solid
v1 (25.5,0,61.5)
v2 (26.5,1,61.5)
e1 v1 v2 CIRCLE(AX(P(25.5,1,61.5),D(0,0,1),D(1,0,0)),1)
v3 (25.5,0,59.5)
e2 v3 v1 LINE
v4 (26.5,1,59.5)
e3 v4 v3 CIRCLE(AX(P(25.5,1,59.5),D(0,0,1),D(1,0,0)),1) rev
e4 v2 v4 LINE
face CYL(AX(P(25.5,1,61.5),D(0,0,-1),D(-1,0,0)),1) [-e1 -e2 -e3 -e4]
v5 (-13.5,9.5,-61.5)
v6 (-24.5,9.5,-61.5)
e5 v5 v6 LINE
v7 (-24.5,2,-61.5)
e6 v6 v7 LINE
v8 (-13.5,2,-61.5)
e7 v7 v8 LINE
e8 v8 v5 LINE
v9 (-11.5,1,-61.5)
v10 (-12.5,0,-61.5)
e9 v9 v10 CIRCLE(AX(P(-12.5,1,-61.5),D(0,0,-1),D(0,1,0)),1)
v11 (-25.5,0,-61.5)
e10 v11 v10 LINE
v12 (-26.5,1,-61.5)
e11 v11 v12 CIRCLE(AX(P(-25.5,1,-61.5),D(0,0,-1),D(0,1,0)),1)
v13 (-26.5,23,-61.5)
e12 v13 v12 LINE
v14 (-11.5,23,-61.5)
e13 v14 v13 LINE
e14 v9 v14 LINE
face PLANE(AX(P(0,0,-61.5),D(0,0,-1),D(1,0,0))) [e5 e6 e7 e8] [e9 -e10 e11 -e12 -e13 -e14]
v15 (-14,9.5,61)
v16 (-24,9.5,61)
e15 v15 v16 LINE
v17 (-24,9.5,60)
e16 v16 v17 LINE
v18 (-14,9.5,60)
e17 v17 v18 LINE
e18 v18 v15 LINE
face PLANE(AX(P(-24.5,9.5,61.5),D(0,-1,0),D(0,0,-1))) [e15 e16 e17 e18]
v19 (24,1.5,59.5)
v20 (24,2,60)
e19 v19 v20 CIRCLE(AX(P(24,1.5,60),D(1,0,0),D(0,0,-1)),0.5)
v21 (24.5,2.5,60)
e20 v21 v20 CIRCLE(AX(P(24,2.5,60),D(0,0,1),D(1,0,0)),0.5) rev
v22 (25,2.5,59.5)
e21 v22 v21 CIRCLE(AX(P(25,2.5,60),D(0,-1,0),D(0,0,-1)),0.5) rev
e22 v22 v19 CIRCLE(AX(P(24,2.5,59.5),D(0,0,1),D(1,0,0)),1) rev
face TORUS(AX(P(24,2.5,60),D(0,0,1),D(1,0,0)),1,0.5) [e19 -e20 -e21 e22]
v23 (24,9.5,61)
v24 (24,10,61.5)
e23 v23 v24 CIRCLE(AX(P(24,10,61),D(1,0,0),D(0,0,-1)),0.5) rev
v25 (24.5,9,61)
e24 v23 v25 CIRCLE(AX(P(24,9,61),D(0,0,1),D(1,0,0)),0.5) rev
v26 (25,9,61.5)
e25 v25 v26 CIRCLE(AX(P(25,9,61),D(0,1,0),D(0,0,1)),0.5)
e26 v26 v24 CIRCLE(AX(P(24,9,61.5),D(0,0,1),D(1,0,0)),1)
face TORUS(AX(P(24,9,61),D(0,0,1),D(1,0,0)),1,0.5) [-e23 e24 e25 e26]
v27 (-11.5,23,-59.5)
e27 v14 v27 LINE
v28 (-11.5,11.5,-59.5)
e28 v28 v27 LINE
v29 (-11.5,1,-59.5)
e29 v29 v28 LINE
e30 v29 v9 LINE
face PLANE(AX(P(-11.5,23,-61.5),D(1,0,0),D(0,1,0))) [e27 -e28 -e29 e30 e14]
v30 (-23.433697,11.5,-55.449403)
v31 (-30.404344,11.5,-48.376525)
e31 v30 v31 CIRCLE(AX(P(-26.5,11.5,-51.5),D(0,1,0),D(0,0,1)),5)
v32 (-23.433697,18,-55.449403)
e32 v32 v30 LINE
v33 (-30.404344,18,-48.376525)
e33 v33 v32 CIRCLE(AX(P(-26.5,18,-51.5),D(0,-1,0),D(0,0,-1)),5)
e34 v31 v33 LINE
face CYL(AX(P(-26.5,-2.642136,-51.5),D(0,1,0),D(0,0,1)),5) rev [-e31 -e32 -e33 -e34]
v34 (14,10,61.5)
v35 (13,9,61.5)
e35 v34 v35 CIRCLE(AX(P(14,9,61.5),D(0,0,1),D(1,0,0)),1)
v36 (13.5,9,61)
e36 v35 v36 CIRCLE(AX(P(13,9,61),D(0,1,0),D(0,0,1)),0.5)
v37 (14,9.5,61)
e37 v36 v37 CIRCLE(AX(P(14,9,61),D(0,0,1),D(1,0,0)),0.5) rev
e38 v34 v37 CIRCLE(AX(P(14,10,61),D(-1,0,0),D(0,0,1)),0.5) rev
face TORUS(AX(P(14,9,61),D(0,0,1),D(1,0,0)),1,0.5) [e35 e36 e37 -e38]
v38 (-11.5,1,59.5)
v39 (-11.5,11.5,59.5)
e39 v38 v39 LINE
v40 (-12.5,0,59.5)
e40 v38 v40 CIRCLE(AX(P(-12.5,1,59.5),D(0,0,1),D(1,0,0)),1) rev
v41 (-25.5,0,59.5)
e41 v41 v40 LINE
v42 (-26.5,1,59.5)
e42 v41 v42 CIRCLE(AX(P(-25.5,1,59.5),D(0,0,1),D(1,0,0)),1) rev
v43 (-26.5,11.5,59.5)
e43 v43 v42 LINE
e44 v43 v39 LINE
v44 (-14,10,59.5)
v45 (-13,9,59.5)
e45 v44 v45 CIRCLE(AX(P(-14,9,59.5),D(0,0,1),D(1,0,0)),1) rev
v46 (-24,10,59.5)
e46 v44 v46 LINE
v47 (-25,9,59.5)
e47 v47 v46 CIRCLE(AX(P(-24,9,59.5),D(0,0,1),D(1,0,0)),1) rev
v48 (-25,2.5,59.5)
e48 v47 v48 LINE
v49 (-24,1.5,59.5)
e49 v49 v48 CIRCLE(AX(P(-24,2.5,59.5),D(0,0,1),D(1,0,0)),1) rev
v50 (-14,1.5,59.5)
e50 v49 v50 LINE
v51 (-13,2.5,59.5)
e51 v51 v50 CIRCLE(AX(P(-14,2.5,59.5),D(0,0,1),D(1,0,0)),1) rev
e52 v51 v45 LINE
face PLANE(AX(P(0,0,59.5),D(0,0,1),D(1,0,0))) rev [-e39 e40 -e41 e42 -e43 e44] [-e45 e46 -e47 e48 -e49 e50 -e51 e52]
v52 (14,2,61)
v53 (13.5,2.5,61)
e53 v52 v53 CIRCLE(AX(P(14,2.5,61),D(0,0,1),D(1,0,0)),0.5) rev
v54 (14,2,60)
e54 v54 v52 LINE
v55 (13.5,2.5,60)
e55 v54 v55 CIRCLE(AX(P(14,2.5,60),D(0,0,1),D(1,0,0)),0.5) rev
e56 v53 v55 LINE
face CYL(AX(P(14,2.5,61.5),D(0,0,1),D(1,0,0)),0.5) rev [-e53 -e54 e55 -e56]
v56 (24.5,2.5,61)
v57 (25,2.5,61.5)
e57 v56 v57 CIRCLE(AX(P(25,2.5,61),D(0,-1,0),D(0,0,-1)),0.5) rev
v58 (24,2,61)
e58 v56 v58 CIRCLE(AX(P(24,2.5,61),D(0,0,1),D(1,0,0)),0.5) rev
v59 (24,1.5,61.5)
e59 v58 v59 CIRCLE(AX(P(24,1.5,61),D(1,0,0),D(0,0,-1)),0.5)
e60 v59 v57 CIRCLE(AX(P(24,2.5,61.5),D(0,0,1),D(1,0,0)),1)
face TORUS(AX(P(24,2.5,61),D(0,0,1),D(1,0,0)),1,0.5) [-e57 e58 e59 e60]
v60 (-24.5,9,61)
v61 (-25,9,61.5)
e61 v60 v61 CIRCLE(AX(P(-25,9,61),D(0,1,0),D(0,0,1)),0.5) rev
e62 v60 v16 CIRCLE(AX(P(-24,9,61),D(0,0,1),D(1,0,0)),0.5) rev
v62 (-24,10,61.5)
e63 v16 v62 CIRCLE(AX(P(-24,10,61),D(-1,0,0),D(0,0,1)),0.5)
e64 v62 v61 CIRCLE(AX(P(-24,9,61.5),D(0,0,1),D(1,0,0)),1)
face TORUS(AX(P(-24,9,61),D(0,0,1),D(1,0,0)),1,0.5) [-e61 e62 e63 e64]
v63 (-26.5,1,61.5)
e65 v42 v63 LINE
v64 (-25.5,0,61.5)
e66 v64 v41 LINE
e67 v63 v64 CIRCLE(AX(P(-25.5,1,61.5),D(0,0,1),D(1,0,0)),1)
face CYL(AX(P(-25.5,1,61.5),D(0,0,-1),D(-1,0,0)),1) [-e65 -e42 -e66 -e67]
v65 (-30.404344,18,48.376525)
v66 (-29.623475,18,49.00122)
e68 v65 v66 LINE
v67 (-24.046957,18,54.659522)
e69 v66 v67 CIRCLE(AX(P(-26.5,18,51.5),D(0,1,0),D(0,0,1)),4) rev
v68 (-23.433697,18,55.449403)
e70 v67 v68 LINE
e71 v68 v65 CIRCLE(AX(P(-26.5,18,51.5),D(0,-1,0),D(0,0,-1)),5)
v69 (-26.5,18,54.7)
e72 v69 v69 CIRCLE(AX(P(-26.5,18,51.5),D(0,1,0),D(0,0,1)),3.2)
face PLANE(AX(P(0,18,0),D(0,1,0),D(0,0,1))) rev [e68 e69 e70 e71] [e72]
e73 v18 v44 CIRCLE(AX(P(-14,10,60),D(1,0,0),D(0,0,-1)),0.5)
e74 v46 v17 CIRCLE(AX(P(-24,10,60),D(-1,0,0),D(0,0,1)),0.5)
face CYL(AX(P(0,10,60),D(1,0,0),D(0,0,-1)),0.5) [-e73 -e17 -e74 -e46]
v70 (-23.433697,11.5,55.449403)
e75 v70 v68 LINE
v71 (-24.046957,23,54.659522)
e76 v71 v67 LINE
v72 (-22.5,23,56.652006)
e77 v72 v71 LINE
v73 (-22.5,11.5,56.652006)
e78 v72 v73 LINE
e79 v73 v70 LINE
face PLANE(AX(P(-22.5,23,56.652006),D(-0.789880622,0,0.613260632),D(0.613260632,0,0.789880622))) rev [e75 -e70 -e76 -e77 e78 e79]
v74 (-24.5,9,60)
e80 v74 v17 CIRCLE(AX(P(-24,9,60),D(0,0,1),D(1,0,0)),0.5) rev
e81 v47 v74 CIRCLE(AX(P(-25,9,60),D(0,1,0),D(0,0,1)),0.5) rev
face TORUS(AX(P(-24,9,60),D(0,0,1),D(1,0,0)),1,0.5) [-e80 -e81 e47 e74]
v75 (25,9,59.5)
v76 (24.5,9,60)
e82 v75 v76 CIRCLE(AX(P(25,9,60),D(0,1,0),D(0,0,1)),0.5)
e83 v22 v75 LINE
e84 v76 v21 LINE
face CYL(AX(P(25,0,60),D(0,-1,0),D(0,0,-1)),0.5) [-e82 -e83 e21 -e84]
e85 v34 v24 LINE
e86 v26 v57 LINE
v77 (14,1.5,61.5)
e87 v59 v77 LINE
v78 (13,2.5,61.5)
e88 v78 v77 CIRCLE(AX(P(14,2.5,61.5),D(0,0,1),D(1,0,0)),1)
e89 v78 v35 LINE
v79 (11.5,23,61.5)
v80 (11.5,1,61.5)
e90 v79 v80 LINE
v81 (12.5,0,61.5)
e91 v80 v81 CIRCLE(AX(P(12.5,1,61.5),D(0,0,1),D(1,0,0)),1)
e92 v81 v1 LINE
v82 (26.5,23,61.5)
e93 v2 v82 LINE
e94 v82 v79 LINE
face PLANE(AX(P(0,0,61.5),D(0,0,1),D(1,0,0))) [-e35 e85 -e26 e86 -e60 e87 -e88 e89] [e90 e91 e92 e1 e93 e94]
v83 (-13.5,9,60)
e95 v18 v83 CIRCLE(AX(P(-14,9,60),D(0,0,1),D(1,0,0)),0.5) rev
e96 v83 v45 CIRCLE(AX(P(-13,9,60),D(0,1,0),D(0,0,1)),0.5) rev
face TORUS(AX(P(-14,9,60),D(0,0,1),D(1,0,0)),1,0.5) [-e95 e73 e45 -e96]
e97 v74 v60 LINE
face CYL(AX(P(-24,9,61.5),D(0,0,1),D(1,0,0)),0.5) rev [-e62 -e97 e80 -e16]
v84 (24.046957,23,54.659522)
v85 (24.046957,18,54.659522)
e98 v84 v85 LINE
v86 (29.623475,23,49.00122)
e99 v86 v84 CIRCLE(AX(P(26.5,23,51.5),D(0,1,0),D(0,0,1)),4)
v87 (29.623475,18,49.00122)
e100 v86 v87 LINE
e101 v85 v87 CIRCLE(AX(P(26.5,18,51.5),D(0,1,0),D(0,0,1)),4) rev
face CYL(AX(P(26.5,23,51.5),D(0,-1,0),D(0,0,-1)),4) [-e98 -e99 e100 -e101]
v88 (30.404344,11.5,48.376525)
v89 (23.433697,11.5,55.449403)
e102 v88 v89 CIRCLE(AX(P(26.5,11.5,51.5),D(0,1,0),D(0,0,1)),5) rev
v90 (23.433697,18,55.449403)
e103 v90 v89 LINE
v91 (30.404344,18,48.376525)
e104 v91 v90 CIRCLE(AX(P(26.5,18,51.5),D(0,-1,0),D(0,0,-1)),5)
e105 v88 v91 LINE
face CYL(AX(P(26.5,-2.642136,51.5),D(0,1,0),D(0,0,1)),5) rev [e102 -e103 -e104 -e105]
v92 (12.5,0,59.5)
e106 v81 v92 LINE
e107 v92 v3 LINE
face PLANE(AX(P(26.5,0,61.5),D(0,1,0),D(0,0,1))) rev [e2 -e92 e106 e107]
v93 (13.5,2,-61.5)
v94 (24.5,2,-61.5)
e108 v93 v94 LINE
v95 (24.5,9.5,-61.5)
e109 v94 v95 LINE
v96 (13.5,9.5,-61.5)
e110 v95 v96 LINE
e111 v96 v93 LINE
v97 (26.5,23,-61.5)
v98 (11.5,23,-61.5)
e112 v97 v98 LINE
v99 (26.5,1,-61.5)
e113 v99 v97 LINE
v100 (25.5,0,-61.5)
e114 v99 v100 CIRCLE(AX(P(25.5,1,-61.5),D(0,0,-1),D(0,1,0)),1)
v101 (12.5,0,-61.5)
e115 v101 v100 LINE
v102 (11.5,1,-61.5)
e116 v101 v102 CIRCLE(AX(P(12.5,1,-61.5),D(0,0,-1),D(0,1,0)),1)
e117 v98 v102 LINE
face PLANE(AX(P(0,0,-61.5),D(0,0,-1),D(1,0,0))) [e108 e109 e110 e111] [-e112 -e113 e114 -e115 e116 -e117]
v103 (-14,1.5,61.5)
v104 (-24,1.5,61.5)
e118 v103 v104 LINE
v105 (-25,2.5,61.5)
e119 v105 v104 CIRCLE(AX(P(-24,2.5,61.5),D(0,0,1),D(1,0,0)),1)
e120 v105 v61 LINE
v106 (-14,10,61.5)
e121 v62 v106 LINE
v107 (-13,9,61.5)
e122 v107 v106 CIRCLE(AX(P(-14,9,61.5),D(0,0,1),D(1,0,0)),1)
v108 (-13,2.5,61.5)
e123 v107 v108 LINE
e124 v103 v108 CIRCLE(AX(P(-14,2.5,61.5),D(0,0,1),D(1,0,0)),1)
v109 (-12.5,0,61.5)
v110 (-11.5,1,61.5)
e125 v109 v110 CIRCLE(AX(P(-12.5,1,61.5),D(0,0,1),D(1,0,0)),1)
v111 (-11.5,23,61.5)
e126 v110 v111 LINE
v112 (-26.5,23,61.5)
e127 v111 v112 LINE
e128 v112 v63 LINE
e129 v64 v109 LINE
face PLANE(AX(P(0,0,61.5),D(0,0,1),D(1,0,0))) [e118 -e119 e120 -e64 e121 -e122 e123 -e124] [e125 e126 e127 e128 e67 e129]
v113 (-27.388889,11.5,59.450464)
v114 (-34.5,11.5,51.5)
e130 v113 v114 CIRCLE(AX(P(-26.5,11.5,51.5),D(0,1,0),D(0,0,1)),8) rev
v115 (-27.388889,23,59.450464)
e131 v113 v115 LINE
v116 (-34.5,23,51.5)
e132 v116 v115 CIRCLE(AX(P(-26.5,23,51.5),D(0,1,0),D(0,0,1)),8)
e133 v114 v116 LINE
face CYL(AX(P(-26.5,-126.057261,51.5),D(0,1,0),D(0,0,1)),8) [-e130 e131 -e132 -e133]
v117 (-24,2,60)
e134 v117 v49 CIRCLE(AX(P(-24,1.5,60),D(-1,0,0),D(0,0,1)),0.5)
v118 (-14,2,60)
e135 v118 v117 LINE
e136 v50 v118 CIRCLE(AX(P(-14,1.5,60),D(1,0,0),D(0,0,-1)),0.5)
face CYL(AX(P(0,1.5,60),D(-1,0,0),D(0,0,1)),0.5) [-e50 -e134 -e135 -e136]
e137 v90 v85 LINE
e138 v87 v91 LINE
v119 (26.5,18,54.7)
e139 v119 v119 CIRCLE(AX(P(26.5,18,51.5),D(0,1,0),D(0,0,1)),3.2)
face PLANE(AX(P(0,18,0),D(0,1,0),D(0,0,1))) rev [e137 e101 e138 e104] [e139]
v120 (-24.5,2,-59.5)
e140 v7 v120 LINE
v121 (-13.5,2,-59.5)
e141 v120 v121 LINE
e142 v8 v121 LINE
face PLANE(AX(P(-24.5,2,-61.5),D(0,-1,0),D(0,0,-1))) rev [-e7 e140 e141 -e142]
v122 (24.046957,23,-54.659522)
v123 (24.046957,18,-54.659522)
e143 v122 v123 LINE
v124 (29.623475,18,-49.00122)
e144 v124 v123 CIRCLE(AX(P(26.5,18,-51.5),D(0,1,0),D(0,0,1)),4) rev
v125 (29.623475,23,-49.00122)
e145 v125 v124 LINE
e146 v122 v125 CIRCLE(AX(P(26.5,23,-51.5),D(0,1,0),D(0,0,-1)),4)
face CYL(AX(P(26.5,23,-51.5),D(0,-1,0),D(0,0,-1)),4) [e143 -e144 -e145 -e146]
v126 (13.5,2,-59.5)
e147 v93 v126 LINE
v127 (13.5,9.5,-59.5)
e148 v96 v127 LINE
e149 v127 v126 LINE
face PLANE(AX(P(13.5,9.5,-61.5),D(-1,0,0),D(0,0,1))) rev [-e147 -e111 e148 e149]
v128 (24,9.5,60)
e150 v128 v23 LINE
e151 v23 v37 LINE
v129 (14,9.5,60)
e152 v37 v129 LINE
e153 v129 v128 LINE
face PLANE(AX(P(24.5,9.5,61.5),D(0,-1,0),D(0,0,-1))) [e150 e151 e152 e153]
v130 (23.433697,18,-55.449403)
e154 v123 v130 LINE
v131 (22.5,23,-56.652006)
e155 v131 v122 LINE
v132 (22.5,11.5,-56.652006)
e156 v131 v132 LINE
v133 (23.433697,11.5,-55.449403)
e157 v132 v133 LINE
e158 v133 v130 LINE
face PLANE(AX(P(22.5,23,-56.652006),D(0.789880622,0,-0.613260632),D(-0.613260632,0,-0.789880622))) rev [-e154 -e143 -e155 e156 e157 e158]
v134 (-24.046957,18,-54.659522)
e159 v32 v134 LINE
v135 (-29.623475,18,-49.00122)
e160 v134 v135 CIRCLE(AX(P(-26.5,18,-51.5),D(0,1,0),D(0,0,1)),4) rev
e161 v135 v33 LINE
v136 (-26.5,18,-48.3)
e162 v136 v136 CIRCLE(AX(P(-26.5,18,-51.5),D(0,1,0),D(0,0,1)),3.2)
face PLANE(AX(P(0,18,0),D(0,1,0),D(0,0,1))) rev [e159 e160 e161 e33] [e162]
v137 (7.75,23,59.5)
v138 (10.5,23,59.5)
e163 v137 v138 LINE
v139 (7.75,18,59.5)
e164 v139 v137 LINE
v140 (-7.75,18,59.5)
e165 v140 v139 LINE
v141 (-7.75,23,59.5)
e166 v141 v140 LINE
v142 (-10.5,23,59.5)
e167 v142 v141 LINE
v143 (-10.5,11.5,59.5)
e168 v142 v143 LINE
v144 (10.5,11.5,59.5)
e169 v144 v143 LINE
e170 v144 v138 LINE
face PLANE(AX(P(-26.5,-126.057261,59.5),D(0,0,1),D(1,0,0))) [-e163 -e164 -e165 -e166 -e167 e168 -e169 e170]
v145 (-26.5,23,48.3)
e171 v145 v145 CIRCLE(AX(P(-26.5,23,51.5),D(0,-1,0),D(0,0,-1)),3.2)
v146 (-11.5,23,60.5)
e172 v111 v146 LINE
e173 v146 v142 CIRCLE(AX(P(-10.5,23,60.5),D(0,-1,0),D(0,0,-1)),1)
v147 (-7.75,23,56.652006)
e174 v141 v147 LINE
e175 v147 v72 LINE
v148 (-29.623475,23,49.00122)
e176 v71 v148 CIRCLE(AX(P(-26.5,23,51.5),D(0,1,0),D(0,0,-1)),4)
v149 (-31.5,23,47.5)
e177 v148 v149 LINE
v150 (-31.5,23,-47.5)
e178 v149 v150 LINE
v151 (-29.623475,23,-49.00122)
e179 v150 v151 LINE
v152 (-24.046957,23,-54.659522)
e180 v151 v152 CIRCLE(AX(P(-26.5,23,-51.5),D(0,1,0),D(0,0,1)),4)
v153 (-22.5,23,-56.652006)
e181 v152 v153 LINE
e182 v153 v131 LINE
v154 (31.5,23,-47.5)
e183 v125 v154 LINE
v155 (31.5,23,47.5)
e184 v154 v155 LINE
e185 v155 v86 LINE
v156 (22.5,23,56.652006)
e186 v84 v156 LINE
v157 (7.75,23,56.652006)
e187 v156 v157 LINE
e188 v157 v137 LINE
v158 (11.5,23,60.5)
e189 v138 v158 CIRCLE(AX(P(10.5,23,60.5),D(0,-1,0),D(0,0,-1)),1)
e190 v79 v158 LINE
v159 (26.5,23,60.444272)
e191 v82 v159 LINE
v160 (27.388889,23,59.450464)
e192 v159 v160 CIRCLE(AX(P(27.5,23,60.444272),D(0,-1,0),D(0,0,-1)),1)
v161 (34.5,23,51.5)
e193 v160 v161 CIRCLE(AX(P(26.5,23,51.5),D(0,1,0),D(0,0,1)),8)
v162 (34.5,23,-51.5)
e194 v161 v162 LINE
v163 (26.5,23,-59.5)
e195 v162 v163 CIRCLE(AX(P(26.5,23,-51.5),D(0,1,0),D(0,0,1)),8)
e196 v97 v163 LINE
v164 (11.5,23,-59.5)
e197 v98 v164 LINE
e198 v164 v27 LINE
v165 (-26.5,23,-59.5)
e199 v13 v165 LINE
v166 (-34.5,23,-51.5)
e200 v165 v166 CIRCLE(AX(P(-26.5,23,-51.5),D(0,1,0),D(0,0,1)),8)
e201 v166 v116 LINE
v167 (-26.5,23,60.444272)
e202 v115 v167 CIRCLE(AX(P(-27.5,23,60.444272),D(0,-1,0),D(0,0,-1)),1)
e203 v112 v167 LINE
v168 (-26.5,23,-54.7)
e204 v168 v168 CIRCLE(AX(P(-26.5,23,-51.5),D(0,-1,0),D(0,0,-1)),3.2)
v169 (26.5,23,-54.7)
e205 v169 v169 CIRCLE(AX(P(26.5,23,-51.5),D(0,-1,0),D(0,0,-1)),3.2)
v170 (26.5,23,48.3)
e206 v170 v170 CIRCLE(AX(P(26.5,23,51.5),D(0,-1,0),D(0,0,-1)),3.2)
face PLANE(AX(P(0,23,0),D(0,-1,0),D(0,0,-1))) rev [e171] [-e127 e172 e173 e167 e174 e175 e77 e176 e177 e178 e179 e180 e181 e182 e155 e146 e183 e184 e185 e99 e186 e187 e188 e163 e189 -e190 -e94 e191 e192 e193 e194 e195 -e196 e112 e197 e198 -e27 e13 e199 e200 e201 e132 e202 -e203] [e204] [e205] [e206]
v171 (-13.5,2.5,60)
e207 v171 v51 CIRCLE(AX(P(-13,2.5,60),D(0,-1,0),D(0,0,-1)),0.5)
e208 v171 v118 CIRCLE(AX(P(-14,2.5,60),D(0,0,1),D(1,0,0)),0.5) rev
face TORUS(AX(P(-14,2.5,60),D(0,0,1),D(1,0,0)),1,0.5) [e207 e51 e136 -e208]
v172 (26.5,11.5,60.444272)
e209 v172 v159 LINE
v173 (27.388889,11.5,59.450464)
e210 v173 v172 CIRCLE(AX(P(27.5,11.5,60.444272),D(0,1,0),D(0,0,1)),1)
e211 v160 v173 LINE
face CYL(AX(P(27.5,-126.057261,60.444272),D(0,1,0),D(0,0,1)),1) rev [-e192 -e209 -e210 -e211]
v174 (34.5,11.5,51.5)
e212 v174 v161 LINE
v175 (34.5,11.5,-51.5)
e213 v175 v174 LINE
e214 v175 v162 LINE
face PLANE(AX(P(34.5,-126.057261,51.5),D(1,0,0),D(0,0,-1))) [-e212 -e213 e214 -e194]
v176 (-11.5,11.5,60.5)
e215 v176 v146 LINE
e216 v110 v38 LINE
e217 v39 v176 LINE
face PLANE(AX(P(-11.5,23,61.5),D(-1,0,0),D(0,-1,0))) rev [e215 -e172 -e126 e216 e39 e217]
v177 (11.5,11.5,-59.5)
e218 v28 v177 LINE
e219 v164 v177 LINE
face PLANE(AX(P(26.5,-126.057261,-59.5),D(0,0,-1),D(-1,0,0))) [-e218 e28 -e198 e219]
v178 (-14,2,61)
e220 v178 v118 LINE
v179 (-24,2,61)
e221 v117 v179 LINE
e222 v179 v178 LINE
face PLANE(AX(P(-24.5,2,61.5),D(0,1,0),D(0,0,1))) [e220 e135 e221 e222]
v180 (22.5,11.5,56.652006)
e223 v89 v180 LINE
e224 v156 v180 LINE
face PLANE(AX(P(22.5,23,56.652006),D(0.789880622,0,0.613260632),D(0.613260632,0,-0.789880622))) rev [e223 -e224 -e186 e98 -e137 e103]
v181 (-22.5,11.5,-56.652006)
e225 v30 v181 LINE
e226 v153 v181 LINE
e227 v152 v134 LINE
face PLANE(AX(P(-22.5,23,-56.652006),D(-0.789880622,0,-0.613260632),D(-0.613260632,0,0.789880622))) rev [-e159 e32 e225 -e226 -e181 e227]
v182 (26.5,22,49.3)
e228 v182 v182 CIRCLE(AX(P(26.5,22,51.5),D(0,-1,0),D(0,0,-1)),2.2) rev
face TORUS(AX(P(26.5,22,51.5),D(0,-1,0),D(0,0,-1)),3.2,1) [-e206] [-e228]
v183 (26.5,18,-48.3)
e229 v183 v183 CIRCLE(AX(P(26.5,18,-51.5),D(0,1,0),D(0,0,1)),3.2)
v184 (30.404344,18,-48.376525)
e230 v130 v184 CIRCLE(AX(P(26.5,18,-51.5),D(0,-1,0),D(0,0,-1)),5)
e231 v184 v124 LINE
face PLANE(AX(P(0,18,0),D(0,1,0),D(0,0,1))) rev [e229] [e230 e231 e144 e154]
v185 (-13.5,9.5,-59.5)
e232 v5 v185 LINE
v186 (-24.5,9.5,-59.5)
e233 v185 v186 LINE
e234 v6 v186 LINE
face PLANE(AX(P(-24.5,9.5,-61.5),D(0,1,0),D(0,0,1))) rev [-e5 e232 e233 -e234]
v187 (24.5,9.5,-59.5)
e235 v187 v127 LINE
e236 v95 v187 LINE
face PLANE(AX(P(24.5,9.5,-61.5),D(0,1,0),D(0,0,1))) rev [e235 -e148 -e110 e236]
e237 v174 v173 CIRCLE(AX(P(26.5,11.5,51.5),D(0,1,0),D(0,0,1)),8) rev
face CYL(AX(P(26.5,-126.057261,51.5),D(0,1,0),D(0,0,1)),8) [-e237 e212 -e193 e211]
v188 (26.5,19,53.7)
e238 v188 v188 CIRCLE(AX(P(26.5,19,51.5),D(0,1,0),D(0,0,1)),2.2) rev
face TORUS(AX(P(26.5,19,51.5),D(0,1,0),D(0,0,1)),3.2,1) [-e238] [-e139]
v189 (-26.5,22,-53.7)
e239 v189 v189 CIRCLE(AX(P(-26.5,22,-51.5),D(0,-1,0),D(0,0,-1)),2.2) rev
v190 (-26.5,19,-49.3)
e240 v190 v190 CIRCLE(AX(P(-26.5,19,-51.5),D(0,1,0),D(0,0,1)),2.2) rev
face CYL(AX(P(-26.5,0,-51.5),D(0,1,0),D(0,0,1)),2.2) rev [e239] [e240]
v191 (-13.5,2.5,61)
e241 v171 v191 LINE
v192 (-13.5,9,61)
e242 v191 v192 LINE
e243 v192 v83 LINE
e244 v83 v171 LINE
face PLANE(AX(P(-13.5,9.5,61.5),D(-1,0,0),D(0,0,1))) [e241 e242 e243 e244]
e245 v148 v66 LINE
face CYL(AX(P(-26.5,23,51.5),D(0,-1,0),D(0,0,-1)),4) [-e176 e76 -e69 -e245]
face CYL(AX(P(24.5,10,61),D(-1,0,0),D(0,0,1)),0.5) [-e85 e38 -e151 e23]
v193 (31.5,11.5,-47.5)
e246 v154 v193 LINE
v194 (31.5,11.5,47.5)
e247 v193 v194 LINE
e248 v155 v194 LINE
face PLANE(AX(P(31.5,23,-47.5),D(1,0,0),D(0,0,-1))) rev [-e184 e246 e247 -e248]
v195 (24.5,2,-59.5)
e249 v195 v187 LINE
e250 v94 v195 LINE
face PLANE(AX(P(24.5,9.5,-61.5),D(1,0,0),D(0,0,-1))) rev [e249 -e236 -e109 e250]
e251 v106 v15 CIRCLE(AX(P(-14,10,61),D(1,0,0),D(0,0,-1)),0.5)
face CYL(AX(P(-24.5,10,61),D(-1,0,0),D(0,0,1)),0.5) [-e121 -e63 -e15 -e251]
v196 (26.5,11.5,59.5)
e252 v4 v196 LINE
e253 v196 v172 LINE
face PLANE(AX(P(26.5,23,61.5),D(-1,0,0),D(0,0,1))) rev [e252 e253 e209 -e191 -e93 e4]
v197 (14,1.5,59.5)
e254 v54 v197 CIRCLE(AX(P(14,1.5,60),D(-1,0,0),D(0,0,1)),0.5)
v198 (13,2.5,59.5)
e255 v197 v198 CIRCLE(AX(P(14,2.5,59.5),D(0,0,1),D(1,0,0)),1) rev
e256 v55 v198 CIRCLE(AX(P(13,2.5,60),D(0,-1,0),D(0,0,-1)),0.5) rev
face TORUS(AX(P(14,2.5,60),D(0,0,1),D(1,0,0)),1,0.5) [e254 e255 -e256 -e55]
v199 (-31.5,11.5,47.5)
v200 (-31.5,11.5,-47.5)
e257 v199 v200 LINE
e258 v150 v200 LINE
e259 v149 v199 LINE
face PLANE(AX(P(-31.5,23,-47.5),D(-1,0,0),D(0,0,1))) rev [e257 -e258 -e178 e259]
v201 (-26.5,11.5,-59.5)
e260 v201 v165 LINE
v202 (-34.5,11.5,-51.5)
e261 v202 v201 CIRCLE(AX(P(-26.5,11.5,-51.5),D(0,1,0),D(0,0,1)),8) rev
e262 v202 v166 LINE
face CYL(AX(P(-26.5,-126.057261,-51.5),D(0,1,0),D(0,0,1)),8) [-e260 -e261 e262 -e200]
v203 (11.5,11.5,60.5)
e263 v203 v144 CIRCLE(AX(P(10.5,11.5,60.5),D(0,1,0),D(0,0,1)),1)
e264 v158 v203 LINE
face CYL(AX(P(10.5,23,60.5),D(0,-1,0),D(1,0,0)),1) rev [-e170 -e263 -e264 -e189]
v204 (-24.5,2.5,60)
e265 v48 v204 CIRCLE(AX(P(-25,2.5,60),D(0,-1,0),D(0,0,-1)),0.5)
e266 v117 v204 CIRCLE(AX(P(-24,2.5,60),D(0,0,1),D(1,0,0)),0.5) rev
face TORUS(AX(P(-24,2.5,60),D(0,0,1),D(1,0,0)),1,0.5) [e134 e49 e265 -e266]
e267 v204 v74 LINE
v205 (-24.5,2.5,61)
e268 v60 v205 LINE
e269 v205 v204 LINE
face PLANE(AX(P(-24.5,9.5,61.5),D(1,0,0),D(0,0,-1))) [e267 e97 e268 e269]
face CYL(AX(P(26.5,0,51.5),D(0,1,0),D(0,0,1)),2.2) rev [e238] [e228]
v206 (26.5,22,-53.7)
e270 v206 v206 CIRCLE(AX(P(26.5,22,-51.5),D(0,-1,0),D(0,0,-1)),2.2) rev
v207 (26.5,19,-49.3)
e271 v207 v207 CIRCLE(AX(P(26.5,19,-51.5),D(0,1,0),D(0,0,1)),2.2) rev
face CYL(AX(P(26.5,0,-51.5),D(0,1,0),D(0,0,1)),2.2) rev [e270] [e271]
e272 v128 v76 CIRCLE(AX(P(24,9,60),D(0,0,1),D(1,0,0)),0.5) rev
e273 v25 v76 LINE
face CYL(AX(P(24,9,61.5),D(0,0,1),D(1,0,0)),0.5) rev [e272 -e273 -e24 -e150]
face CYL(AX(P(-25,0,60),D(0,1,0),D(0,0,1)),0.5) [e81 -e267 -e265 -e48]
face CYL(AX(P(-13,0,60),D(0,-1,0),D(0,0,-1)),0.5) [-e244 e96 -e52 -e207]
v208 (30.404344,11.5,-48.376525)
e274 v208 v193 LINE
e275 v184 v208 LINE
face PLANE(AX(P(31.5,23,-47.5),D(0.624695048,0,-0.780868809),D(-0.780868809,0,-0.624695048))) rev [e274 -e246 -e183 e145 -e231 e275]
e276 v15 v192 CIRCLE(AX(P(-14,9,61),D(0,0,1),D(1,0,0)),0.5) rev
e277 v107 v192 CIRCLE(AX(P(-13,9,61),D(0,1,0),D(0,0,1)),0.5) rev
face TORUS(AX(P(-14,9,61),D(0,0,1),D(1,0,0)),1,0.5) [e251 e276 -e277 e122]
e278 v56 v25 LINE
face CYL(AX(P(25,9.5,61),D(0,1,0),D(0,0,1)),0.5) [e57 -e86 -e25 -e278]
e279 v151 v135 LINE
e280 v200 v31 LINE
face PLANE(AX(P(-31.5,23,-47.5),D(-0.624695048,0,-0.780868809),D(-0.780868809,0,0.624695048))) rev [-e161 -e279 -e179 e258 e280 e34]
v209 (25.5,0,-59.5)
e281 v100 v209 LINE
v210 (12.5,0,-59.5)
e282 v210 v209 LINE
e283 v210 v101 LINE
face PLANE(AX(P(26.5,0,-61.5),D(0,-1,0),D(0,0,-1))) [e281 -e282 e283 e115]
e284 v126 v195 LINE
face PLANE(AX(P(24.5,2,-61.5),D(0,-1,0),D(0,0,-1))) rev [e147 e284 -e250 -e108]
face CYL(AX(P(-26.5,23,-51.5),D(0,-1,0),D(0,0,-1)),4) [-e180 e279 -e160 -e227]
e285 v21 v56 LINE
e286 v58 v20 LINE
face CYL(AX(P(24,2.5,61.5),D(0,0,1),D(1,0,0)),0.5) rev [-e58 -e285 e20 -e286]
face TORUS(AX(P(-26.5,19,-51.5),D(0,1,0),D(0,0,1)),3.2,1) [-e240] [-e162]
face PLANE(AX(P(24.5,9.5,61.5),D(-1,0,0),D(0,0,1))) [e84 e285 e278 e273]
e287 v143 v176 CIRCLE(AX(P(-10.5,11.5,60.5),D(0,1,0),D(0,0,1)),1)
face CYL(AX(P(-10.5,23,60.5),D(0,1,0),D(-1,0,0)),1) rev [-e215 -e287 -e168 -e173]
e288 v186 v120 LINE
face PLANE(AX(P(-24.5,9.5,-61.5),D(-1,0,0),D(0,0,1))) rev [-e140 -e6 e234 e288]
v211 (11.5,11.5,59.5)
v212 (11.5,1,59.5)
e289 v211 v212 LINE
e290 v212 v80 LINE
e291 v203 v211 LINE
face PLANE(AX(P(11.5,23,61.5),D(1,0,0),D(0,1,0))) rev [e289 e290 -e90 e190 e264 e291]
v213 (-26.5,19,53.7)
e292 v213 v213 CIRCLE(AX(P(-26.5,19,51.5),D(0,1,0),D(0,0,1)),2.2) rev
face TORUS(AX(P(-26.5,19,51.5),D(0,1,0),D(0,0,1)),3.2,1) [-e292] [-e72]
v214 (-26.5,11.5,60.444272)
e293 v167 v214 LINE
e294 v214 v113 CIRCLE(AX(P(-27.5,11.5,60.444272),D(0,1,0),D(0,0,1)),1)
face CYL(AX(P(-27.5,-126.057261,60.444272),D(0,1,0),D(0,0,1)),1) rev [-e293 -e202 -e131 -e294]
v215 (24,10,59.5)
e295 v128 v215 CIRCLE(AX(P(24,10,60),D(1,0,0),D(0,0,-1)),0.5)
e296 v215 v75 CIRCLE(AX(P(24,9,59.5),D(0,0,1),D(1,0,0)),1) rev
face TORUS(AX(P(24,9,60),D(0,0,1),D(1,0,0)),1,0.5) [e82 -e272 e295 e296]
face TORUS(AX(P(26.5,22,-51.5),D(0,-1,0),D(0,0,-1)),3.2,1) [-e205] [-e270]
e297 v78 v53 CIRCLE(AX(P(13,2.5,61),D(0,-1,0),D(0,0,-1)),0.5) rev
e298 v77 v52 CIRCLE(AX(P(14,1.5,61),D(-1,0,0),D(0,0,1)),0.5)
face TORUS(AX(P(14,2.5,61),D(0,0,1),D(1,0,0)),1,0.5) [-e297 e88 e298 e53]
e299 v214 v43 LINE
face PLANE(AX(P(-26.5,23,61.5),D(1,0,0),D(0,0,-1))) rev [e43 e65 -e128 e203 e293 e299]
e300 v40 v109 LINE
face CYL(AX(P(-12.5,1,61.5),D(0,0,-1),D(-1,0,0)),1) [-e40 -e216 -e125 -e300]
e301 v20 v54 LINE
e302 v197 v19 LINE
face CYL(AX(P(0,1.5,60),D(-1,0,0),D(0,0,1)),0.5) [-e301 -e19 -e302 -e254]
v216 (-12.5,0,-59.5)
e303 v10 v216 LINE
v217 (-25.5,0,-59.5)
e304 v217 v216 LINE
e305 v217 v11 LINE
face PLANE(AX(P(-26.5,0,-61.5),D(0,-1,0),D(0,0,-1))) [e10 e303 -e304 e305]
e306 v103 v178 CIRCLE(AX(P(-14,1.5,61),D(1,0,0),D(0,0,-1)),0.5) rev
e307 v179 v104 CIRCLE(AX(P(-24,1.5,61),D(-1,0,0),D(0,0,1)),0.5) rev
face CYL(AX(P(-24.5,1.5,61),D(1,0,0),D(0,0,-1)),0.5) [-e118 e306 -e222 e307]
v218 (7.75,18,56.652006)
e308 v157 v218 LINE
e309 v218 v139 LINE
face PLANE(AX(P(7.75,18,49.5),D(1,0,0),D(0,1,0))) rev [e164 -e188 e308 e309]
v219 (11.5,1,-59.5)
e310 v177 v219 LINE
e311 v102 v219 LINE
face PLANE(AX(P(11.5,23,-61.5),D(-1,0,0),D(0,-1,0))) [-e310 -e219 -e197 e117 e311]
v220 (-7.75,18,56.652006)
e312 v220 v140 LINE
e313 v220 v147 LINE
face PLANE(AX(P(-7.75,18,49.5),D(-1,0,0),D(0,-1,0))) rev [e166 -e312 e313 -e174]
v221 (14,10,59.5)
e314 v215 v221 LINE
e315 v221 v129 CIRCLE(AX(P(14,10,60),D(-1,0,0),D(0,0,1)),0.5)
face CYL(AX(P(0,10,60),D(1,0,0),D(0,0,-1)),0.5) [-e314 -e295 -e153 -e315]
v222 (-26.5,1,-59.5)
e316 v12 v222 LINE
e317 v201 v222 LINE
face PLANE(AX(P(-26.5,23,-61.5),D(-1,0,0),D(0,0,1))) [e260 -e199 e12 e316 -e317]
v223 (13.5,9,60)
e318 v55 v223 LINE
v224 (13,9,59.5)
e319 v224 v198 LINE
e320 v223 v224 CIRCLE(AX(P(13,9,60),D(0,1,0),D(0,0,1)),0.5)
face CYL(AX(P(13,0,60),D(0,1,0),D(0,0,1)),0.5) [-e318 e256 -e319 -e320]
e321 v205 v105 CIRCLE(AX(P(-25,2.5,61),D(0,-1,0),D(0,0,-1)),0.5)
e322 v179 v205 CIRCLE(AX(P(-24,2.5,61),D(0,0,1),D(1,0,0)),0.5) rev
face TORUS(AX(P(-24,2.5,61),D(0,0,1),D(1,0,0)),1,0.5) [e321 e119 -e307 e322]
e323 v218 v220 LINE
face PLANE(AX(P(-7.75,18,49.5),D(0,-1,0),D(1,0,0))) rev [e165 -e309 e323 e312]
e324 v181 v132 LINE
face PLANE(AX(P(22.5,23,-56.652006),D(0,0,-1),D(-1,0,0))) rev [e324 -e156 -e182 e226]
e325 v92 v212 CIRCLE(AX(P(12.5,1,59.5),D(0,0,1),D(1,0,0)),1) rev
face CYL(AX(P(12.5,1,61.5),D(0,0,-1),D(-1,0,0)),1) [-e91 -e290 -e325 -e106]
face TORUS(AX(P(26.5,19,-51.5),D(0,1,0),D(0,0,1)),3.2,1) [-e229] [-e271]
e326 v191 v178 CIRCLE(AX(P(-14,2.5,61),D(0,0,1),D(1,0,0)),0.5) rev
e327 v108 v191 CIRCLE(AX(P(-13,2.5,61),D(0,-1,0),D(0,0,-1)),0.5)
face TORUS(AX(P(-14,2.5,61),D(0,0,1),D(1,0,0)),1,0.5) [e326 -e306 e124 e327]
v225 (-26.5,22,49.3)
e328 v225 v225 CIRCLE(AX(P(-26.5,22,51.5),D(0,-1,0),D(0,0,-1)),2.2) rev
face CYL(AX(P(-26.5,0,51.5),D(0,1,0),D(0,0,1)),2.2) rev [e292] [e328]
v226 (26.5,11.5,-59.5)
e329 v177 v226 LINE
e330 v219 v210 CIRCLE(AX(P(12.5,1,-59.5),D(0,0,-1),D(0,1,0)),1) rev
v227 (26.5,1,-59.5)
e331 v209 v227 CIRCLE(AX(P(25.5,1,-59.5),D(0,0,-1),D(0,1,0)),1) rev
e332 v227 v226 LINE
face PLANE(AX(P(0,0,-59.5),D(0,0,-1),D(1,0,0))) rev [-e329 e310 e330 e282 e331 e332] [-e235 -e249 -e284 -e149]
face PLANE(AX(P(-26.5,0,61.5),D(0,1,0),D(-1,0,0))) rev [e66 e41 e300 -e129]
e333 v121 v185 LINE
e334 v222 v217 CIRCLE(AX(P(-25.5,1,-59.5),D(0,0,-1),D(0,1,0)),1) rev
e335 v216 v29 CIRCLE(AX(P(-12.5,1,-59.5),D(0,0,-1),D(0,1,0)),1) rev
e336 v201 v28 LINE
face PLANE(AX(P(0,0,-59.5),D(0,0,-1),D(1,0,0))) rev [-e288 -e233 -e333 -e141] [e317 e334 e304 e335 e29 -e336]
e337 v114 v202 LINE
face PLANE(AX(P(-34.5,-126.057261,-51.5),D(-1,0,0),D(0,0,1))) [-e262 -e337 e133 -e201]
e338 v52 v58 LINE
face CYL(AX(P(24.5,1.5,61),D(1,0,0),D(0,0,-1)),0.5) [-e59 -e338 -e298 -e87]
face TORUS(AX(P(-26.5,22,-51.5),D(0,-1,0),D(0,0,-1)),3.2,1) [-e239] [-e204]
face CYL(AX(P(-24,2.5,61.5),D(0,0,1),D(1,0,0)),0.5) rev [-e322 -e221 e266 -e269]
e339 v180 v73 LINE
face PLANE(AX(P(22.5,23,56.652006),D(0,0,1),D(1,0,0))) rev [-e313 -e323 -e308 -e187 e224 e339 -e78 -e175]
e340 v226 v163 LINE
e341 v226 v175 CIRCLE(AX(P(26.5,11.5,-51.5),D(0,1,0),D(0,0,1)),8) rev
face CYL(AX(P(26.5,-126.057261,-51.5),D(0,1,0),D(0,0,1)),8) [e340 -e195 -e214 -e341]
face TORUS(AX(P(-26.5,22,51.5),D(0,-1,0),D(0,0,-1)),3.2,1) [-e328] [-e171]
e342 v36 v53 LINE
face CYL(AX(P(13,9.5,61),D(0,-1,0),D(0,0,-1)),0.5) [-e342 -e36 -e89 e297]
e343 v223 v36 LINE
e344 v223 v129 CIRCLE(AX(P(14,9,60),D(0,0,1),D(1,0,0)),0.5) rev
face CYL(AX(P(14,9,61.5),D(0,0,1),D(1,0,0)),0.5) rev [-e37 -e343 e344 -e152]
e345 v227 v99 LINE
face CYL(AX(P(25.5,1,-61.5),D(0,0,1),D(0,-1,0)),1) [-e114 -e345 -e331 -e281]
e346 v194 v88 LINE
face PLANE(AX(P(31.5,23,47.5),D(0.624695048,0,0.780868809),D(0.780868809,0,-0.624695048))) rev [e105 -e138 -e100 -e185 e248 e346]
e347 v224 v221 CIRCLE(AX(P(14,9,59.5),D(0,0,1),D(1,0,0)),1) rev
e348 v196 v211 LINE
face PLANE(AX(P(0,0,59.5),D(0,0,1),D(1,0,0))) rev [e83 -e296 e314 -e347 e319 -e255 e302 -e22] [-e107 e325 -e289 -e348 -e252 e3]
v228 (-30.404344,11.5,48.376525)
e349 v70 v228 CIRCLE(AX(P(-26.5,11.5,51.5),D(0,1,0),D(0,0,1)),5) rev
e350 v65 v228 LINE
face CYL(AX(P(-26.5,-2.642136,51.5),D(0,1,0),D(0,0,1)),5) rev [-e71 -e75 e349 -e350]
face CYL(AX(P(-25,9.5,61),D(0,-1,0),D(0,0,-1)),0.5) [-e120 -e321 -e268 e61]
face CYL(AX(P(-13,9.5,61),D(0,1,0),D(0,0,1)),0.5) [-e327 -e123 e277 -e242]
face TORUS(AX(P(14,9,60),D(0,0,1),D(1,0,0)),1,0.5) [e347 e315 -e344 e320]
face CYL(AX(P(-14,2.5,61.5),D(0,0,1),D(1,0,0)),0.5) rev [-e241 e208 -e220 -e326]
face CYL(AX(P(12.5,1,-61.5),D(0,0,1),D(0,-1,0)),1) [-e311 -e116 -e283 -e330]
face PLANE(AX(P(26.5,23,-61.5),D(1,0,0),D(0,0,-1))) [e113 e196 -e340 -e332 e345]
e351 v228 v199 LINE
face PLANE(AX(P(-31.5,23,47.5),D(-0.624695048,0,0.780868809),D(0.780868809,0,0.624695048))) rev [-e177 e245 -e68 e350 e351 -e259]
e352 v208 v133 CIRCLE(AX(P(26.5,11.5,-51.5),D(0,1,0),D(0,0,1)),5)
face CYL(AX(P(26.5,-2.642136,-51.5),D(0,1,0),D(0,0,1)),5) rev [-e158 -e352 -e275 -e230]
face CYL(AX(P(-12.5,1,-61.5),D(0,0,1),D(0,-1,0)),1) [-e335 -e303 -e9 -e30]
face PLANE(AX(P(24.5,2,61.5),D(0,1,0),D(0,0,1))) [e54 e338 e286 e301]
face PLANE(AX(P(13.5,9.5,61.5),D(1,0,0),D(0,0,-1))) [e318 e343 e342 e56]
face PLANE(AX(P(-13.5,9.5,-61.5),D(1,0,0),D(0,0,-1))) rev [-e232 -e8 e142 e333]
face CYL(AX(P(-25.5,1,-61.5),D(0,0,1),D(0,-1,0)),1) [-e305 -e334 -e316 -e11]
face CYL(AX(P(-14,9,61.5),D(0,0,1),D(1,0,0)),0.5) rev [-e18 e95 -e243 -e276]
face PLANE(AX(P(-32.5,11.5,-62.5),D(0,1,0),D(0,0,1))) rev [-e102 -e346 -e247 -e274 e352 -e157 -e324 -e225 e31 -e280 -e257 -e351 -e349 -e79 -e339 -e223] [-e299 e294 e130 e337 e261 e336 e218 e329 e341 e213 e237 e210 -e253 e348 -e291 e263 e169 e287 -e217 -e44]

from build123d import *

# Parameters (mm, degrees)
SKETCH1_W           = 65
SKETCH1_H           = 115
SKETCH1_W_2         = 55
SKETCH1_H_2         = 105
BOSS_EXTRUDE1_DEPTH = 23
FILLET1_R           = 6
SKETCH2_R           = 6
BOSS_EXTRUDE2_DEPTH = 23
SKETCH4_R           = 2.2
CUT_EXTRUDE1_DEPTH  = 23
SKETCH7_W           = 55
SKETCH7_H           = 105
CUT_EXTRUDE2_DEPTH  = 13
SKETCH8_W           = 65
SKETCH8_H           = 11.5
CUT_EXTRUDE3_DEPTH  = 120
SKETCH9_R           = 5
CUT_EXTRUDE4_DEPTH  = 6.5
BOSS_EXTRUDE3_DEPTH = 11.5
SKETCH12_W          = 15
SKETCH12_H          = 23
SKETCH12_W_2        = 11
SKETCH12_H_2        = 7.5
BOSS_EXTRUDE4_DEPTH = 2
FILLET2_R           = 1
FILLET3_R           = 0.5
MIRROR12_START      = -61.5
MIRROR12_OUTLINE_W  = 11
MIRROR12_OUTLINE_H  = 7.5
MIRROR12_DEPTH      = 2
SKETCH15_W          = 15.5
SKETCH15_H          = 5
CUT_EXTRUDE5_DEPTH  = 10
CUT_EXTRUDE6_DEPTH  = 72.447533214


# Read off the part's stored shape, not the designer's step: Mirror12
with BuildPart() as part:
    # Sketch1 → Boss-Extrude1 (new body)
    with BuildSketch(Plane(origin=(0, 0, 0), x_dir=(1, 0, 0), z_dir=(0, 1, 0))):
        Rectangle(SKETCH1_W, SKETCH1_H)
        Rectangle(SKETCH1_W_2, SKETCH1_H_2, mode=Mode.SUBTRACT)
    extrude(amount=BOSS_EXTRUDE1_DEPTH)

    # Fillet1
    fillet1_edges = [part.edges().sort_by_distance(p)[0] for p in [
        (32.5, 11.5, 57.5),
        (-32.5, 11.5, 57.5),
        (-32.5, 11.5, -57.5),
        (32.5, 11.5, -57.5),
    ]]
    fillet(fillet1_edges, radius=FILLET1_R)

    # Sketch2 → Boss-Extrude2 (add)
    with BuildSketch(Plane(origin=(0, 23, 0), x_dir=(1, 0, 0), z_dir=(0, 1, 0))):
        with Locations((-26.5, 51.5)):
            Circle(SKETCH2_R)
        with Locations((26.5, 51.5)):
            Circle(SKETCH2_R)
        with Locations((-26.5, -51.5)):
            Circle(SKETCH2_R)
        with Locations((26.5, -51.5)):
            Circle(SKETCH2_R)
    extrude(amount=-BOSS_EXTRUDE2_DEPTH)

    # Sketch4 → Cut-Extrude1 (cut)
    with BuildSketch(Plane(origin=(0, 23, 0), x_dir=(1, 0, 0), z_dir=(0, 1, 0))):
        with Locations(Location((-26.5, 51.5, 0), (0, 0, 270))):
            Circle(SKETCH4_R)
        with Locations(Location((26.5, 51.5, 0), (0, 0, 270))):
            Circle(SKETCH4_R)
        with Locations(Location((26.5, -51.5, 0), (0, 0, 270))):
            Circle(SKETCH4_R)
        with Locations(Location((-26.5, -51.5, 0), (0, 0, 270))):
            Circle(SKETCH4_R)
    extrude(amount=-CUT_EXTRUDE1_DEPTH, mode=Mode.SUBTRACT)

    # Sketch7 → Cut-Extrude2 (cut)
    with BuildSketch(Plane(origin=(0, 18, 0), x_dir=(1, 0, 0), z_dir=(0, 1, 0))):
        Rectangle(SKETCH7_W, SKETCH7_H)
    extrude(amount=-CUT_EXTRUDE2_DEPTH, mode=Mode.SUBTRACT)

    # Sketch8 → Cut-Extrude3 (cut)
    with BuildSketch(Plane.XY.offset(57.5)):
        with Locations((0, 5.75)):
            Rectangle(SKETCH8_W, SKETCH8_H)
    extrude(amount=-CUT_EXTRUDE3_DEPTH, mode=Mode.SUBTRACT)

    # Sketch9 → Cut-Extrude4 (cut)
    with BuildSketch(Plane.XZ.offset(-18)):
        with Locations((-26.5, -51.5)):
            Circle(SKETCH9_R)
        with Locations((26.5, -51.5)):
            Circle(SKETCH9_R)
        with Locations((26.5, 51.5)):
            Circle(SKETCH9_R)
        with Locations((-26.5, 51.5)):
            Circle(SKETCH9_R)
    extrude(amount=CUT_EXTRUDE4_DEPTH, mode=Mode.SUBTRACT)

    # Sketch10 → Boss-Extrude3 (add)
    with BuildSketch(Plane(origin=(0, 23, 0), x_dir=(1, 0, 0), z_dir=(0, 1, 0))):
        with BuildLine():
            Line((-26.5, -59.5), (26.5, -59.5))
            ThreePointArc((26.5, -59.5), (32.156854249, -57.156854249), (34.5, -51.5))
            Line((34.5, -51.5), (34.5, 51.5))
            ThreePointArc((34.5, 51.5), (32.156854249, 57.156854249), (26.5, 59.5))
            Line((26.5, 59.5), (-26.5, 59.5))
            ThreePointArc((-26.5, 59.5), (-32.156854249, 57.156854249), (-34.5, 51.5))
            Line((-34.5, 51.5), (-34.5, -51.5))
            ThreePointArc((-34.5, -51.5), (-32.156854249, -57.156854249), (-26.5, -59.5))
        make_face()
        with BuildLine():
            Line((-26.5, -57.5), (26.5, -57.5))
            ThreePointArc((26.5, -57.5), (30.742640687, -55.742640687), (32.5, -51.5))
            Line((32.5, -51.5), (32.5, 51.5))
            ThreePointArc((32.5, 51.5), (30.742640687, 55.742640687), (26.5, 57.5))
            Line((26.5, 57.5), (-26.5, 57.5))
            ThreePointArc((-26.5, 57.5), (-30.742640687, 55.742640687), (-32.5, 51.5))
            Line((-32.5, 51.5), (-32.5, -51.5))
            ThreePointArc((-32.5, -51.5), (-30.742640687, -55.742640687), (-26.5, -57.5))
        make_face(mode=Mode.SUBTRACT)
    extrude(amount=-BOSS_EXTRUDE3_DEPTH)

    # Sketch12 → Boss-Extrude4 (add)
    # profile 1 of 2: a face of its own
    with BuildSketch(Plane.XY.offset(59.5)):
        with Locations((-19, 11.5)):
            Rectangle(SKETCH12_W, SKETCH12_H)
        with Locations((-19, 5.75)):
            Rectangle(SKETCH12_W_2, SKETCH12_H_2, mode=Mode.SUBTRACT)
    # profile 2 of 2: a face of its own
    with BuildSketch(Plane.XY.offset(59.5)):
        with Locations((19, 11.5)):
            Rectangle(SKETCH12_W, SKETCH12_H)
        with Locations((19, 5.75)):
            Rectangle(SKETCH12_W_2, SKETCH12_H_2, mode=Mode.SUBTRACT)
    extrude(amount=BOSS_EXTRUDE4_DEPTH)

    # Fillet2
    fillet2_edges = [part.edges().sort_by_distance(p)[0] for p in [
        (27.5, 20.5, -45.583920217),
        (20.583920217, 20.5, -52.5),
        (-20.583920217, 20.5, -52.5),
        (-27.5, 20.5, -45.583920217),
        (20.583920217, 20.5, 52.5),
        (27.5, 20.5, 45.583920217),
        (-27.5, 20.5, 45.583920217),
        (-20.583920217, 20.5, 52.5),
        (22.257359313, 18, -47.257359313),
        (27.5, 18, -46.092470366),
        (21.092470366, 18, -52.5),
        (26.5, 18, -53.7),
        (-22.257359313, 18, -47.257359313),
        (-21.092470366, 18, -52.5),
        (-27.5, 18, -46.092470366),
        (-26.5, 18, -53.7),
        (26.5, 18, 49.3),
        (22.257359313, 18, 47.257359313),
        (21.092470366, 18, 52.5),
        (27.5, 18, 46.092470366),
        (-22.257359313, 18, 47.257359313),
        (-27.5, 18, 46.092470366),
        (-21.092470366, 18, 52.5),
        (-26.5, 18, 49.3),
        (11.5, 17.25, 59.5),
        (-11.5, 17.25, 59.5),
        (-26.5, 17.25, 59.5),
        (26.5, 17.25, 59.5),
        (11.5, 0, 60.5),
        (26.5, 0, 60.5),
        (-11.5, 0, 60.5),
        (-26.5, 0, 60.5),
        (26.5, 23, -53.7),
        (-26.5, 23, -53.7),
        (-26.5, 23, 49.3),
        (26.5, 23, 49.3),
    ]]
    fillet(fillet2_edges, radius=FILLET2_R - 0.0001)  # a hair under: the kernel refuses the full size

    # Fillet3
    fillet3_edges = [part.edges().sort_by_distance(p)[0] for p in [
        (-13.5, 5.75, 59.5),
        (-19, 9.5, 59.5),
        (-24.5, 5.75, 59.5),
        (-19, 2, 59.5),
        (-13.5, 5.75, 61.5),
        (-13.5, 9.5, 60.5),
        (-19, 9.5, 61.5),
        (-24.5, 9.5, 60.5),
        (-24.5, 5.75, 61.5),
        (-24.5, 2, 60.5),
        (-19, 2, 61.5),
        (-13.5, 2, 60.5),
        (19, 9.5, 59.5),
        (13.5, 5.75, 59.5),
        (19, 2, 59.5),
        (24.5, 5.75, 59.5),
        (19, 9.5, 61.5),
        (13.5, 9.5, 60.5),
        (13.5, 5.75, 61.5),
        (13.5, 2, 60.5),
        (19, 2, 61.5),
        (24.5, 2, 60.5),
        (24.5, 5.75, 61.5),
        (24.5, 9.5, 60.5),
    ]]
    fillet(fillet3_edges, radius=FILLET3_R)

    # Mirror12 outline → Mirror12 (add)
    # profile 1 of 2: a face of its own
    with BuildSketch(Plane.XY.offset(MIRROR12_START)):
        with BuildLine():
            Line((-11.5, 23), (-26.5, 23))
            Line((-26.5, 23), (-26.5, 1))
            ThreePointArc((-26.5, 1), (-26.207106781, 0.292893219), (-25.5, 0))
            Line((-25.5, 0), (-12.5, 0))
            ThreePointArc((-12.5, 0), (-11.792893219, 0.292893219), (-11.5, 1))
            Line((-11.5, 1), (-11.5, 23))
        make_face()
        with Locations((-19, 5.75)):
            Rectangle(MIRROR12_OUTLINE_W, MIRROR12_OUTLINE_H, mode=Mode.SUBTRACT)
    # profile 2 of 2: a face of its own
    with BuildSketch(Plane.XY.offset(MIRROR12_START)):
        with BuildLine():
            Line((26.5, 23), (11.5, 23))
            Line((11.5, 23), (11.5, 1))
            ThreePointArc((11.5, 1), (11.792893219, 0.292893219), (12.5, 0))
            Line((12.5, 0), (25.5, 0))
            ThreePointArc((25.5, 0), (26.207106781, 0.292893219), (26.5, 1))
            Line((26.5, 1), (26.5, 23))
        make_face()
        with Locations((19, 5.75)):
            Rectangle(MIRROR12_OUTLINE_W, MIRROR12_OUTLINE_H, mode=Mode.SUBTRACT)
    extrude(amount=MIRROR12_DEPTH)

    # Sketch15 → Cut-Extrude5 (cut)
    with BuildSketch(Plane.XY.offset(59.5)):
        with Locations((0, 20.5)):
            Rectangle(SKETCH15_W, SKETCH15_H)
    extrude(amount=-CUT_EXTRUDE5_DEPTH, mode=Mode.SUBTRACT)

    # Sketch16 → Cut-Extrude6 (cut, through all)
    with BuildSketch(Plane.XZ.offset(-11.5)):
        with BuildLine():
            Line((-31.5, 47.5), (-29.623475238, 49.00121981))
            ThreePointArc((-29.623475238, 49.00121981), (-23.651058564, 48.692237066), (-24.046957473, 54.659522489))
            Line((-24.046957473, 54.659522489), (-22.5, 56.652006057))
            Line((-22.5, 56.652006057), (22.5, 56.652006057))
            Line((22.5, 56.652006057), (24.046957473, 54.659522489))
            ThreePointArc((24.046957473, 54.659522489), (23.651058564, 48.692237066), (29.623475238, 49.00121981))
            Line((29.623475238, 49.00121981), (31.5, 47.5))
            Line((31.5, 47.5), (31.5, -47.5))
            Line((31.5, -47.5), (29.623475238, -49.00121981))
            ThreePointArc((29.623475238, -49.00121981), (23.651058564, -48.692237066), (24.046957473, -54.659522489))
            Line((24.046957473, -54.659522489), (22.5, -56.652006057))
            Line((22.5, -56.652006057), (-22.5, -56.652006057))
            Line((-22.5, -56.652006057), (-24.046957473, -54.659522489))
            ThreePointArc((-24.046957473, -54.659522489), (-23.651058564, -48.692237066), (-29.623475238, -49.00121981))
            Line((-29.623475238, -49.00121981), (-31.5, -47.5))
            Line((-31.5, -47.5), (-31.5, 47.5))
        make_face()
    extrude(amount=-CUT_EXTRUDE6_DEPTH, mode=Mode.SUBTRACT)


solid = part.part
